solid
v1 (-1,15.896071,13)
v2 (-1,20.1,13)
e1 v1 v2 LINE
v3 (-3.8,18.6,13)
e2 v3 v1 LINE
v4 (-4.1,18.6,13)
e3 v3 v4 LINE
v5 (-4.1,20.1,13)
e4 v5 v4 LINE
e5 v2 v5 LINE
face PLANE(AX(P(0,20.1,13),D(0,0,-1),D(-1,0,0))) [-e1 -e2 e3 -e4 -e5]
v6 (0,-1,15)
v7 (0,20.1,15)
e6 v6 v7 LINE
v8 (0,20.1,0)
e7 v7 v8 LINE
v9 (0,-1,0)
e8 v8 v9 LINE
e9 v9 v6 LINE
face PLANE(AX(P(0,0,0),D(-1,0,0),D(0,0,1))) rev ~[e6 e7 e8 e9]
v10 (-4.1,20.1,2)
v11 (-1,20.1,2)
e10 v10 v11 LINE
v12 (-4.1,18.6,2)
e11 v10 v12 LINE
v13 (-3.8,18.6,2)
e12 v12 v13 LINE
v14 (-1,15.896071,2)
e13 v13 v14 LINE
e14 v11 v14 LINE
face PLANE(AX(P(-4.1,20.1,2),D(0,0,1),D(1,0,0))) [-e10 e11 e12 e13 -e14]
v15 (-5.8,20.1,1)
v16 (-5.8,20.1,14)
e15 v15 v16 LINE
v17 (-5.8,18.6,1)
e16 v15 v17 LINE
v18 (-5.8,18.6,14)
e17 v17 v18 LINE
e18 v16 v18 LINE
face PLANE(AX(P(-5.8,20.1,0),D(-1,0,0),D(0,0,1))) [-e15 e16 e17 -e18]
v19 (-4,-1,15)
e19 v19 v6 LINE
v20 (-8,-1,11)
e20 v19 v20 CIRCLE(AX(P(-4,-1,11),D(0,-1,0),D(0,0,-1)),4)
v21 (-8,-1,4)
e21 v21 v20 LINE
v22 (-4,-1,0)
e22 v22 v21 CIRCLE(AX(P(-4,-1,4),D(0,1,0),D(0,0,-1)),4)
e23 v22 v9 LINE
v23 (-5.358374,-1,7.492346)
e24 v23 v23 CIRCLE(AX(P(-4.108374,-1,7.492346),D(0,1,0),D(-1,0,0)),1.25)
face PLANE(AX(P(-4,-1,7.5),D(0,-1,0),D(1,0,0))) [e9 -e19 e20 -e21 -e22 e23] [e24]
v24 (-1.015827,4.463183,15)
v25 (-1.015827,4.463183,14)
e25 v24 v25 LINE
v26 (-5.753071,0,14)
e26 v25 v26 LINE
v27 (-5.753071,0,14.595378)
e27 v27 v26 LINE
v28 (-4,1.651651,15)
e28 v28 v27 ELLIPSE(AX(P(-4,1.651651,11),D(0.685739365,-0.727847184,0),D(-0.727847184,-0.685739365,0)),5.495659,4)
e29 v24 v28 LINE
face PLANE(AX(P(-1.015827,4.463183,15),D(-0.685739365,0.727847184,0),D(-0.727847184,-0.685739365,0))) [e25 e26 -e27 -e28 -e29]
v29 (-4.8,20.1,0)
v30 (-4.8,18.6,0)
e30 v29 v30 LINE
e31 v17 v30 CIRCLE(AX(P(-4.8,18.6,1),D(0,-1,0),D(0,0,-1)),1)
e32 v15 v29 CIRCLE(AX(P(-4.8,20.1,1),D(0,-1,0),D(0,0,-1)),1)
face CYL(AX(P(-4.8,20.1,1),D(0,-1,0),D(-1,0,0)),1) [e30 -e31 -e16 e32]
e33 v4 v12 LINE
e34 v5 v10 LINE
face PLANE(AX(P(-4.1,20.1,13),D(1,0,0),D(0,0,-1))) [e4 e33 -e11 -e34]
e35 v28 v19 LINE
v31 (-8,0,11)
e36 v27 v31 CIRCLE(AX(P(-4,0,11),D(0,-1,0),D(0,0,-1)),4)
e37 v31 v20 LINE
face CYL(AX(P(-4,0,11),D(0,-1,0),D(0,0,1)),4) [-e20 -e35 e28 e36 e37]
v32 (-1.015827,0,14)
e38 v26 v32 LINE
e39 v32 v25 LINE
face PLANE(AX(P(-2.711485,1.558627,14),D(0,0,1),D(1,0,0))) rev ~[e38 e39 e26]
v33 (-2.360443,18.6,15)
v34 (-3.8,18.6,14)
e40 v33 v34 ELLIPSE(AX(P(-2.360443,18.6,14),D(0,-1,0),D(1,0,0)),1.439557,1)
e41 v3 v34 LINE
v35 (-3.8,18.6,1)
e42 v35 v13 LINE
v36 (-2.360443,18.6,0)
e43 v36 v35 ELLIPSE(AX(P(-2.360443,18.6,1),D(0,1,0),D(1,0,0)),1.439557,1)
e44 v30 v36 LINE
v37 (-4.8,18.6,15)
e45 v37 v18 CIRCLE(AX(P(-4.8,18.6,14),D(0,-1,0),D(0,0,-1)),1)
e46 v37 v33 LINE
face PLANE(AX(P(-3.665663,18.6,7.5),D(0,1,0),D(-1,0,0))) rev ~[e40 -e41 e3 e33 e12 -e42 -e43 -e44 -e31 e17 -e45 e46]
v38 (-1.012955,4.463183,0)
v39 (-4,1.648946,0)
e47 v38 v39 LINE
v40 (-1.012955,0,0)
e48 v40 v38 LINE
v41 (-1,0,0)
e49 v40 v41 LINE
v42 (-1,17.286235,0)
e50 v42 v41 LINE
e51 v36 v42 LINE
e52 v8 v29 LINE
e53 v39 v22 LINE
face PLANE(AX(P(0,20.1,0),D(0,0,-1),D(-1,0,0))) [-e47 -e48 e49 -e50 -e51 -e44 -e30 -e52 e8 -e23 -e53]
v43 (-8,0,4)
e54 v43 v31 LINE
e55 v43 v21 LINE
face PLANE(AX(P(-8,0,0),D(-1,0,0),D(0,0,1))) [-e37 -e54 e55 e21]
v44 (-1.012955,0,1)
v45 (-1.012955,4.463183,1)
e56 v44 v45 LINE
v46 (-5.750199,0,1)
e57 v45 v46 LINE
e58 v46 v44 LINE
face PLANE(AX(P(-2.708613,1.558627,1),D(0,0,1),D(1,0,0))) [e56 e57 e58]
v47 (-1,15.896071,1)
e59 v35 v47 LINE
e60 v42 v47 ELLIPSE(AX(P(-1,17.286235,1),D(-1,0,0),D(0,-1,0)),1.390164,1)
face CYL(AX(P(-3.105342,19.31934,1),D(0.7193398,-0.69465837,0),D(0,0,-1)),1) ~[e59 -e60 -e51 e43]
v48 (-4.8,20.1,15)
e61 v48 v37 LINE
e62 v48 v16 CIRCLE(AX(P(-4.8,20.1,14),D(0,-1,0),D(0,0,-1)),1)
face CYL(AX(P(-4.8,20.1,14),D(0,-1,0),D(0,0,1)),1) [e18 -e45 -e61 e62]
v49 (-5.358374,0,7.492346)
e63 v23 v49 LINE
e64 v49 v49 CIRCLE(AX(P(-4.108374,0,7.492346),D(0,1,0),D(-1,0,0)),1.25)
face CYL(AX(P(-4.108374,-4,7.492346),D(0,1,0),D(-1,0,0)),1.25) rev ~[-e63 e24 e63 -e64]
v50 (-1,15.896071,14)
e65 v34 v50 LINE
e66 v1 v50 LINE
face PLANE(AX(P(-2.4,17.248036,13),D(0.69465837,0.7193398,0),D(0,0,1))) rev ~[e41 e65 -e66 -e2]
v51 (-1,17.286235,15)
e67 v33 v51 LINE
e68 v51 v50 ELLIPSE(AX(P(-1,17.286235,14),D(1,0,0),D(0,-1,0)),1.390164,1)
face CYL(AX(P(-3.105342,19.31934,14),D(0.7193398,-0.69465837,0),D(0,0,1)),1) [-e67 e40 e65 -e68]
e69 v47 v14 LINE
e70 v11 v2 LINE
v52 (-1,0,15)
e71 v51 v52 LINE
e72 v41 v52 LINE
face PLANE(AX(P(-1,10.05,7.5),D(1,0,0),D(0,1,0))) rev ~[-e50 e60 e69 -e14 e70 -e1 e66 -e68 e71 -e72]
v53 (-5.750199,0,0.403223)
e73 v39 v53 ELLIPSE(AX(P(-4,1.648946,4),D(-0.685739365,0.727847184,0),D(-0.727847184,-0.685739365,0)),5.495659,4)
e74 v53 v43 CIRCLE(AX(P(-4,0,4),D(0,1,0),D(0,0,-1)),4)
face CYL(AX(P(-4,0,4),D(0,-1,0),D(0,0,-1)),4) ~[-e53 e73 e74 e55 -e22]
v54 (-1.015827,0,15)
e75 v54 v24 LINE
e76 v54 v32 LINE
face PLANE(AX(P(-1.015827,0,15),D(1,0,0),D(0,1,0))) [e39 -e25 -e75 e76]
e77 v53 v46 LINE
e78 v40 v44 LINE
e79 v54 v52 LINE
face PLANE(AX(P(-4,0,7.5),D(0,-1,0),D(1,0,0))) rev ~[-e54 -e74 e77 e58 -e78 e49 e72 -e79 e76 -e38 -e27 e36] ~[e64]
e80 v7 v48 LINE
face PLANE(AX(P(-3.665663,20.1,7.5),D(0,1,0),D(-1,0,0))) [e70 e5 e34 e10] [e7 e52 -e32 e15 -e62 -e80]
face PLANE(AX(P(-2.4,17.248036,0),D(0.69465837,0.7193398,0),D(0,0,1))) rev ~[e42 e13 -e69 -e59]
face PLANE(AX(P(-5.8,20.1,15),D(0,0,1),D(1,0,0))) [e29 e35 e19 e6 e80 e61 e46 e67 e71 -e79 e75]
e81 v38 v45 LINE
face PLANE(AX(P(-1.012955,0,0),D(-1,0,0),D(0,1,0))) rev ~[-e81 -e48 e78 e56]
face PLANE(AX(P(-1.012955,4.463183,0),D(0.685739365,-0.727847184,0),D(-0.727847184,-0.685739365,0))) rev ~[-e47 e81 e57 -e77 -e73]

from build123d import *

# Parameters (mm, degrees)
F1_E1_W   = 20.1
F1_E1_H   = 15
F2_DEPTH  = 1
F1_E0_W   = 8
F1_E0_H   = 15
F3_DEPTH  = 1
F5_DEPTH  = 1
F7_DEPTH  = 1
F9_DEPTH  = 1.5
F11_R     = 4
F12_R     = 1
F13_SIZE2 = 2.7039285695
F13_SIZE  = 2.8
F14_R     = 1
F16_D     = 2.5
F16_DEPTH = 3
F16_TIP   = 0.7510757738


with BuildPart() as f2:
    # F1_E1 (on explicit) → F2 (new body)
    with BuildSketch(Plane.YZ):
        with Locations((10.05, 7.5)):
            Rectangle(F1_E1_W, F1_E1_H)
    extrude(amount=-F2_DEPTH)

    # F1_E0 (on explicit) → F3 (join)
    with BuildSketch(Plane(origin=(-8, 0, 0), x_dir=(1, 0, 0), z_dir=(0, -1, 0))):
        with Locations((4, 7.5)):
            Rectangle(F1_E0_W, F1_E0_H)
    extrude(amount=F3_DEPTH)

    # F4 (on Top) → F5 (join)
    with BuildSketch(Plane.XY):
        Polygon((-5.7501993142, 0), (-1.0129548609, 0), (-1.0129548609, 4.4631827623), align=None)
    extrude(amount=F5_DEPTH)

    # F6 (on face) → F7 (join)
    with BuildSketch(Plane.XY.offset(15)):
        Polygon((-5.7530710474, 0), (-1.0158265941, 0), (-1.0158265941, 4.4631827623), align=None)
    extrude(amount=-F7_DEPTH)

    # F8 (on face) → F9 (join)
    with BuildSketch(Plane(origin=(0, 20.1, 0), x_dir=(-1, 0, 0), z_dir=(0, 1, 0))):
        Polygon((5.8, 15), (0, 15), (0, 13), (4.1, 13), (4.1, 2), (0, 2), (0, 0), (5.8, 0), align=None)
    extrude(amount=-F9_DEPTH)

    # F10: union 

    # F11
    f11_edges = [f2.edges().sort_by_distance(p)[0] for p in [
        (-8, -0.5, 0),
        (-8, -0.5, 15),
    ]]
    fillet(f11_edges, radius=F11_R)

    # F12
    f12_edges = [f2.edges().sort_by_distance(p)[0] for p in [
        (-5.8, 19.35, 0),
        (-5.8, 19.35, 15),
    ]]
    fillet(f12_edges, radius=F12_R)

    # F13
    f13_edges = [f2.edges().sort_by_distance(p)[0] for p in [
        (-1, 18.6, 1),
        (-1, 18.6, 14),
    ]]
    chamfer(f13_edges, length=F13_SIZE, length2=F13_SIZE2)

    # F14
    f14_edges = [f2.edges().sort_by_distance(p)[0] for p in [
        (-2.4, 17.248036, 0),
        (-2.4, 17.248036, 15),
    ]]
    fillet(f14_edges, radius=F14_R)

    # F16
    with Locations(Plane.XZ.offset(1)):
        with Locations((-4.1083735414, 7.4923457578)):
            Hole(F16_D / 2, depth=F16_DEPTH)
            with Locations((0, 0, -(F16_DEPTH + F16_TIP / 2))):  # 118° drill point
                Cone(0, F16_D / 2, F16_TIP, mode=Mode.SUBTRACT)


solid = f2.part
